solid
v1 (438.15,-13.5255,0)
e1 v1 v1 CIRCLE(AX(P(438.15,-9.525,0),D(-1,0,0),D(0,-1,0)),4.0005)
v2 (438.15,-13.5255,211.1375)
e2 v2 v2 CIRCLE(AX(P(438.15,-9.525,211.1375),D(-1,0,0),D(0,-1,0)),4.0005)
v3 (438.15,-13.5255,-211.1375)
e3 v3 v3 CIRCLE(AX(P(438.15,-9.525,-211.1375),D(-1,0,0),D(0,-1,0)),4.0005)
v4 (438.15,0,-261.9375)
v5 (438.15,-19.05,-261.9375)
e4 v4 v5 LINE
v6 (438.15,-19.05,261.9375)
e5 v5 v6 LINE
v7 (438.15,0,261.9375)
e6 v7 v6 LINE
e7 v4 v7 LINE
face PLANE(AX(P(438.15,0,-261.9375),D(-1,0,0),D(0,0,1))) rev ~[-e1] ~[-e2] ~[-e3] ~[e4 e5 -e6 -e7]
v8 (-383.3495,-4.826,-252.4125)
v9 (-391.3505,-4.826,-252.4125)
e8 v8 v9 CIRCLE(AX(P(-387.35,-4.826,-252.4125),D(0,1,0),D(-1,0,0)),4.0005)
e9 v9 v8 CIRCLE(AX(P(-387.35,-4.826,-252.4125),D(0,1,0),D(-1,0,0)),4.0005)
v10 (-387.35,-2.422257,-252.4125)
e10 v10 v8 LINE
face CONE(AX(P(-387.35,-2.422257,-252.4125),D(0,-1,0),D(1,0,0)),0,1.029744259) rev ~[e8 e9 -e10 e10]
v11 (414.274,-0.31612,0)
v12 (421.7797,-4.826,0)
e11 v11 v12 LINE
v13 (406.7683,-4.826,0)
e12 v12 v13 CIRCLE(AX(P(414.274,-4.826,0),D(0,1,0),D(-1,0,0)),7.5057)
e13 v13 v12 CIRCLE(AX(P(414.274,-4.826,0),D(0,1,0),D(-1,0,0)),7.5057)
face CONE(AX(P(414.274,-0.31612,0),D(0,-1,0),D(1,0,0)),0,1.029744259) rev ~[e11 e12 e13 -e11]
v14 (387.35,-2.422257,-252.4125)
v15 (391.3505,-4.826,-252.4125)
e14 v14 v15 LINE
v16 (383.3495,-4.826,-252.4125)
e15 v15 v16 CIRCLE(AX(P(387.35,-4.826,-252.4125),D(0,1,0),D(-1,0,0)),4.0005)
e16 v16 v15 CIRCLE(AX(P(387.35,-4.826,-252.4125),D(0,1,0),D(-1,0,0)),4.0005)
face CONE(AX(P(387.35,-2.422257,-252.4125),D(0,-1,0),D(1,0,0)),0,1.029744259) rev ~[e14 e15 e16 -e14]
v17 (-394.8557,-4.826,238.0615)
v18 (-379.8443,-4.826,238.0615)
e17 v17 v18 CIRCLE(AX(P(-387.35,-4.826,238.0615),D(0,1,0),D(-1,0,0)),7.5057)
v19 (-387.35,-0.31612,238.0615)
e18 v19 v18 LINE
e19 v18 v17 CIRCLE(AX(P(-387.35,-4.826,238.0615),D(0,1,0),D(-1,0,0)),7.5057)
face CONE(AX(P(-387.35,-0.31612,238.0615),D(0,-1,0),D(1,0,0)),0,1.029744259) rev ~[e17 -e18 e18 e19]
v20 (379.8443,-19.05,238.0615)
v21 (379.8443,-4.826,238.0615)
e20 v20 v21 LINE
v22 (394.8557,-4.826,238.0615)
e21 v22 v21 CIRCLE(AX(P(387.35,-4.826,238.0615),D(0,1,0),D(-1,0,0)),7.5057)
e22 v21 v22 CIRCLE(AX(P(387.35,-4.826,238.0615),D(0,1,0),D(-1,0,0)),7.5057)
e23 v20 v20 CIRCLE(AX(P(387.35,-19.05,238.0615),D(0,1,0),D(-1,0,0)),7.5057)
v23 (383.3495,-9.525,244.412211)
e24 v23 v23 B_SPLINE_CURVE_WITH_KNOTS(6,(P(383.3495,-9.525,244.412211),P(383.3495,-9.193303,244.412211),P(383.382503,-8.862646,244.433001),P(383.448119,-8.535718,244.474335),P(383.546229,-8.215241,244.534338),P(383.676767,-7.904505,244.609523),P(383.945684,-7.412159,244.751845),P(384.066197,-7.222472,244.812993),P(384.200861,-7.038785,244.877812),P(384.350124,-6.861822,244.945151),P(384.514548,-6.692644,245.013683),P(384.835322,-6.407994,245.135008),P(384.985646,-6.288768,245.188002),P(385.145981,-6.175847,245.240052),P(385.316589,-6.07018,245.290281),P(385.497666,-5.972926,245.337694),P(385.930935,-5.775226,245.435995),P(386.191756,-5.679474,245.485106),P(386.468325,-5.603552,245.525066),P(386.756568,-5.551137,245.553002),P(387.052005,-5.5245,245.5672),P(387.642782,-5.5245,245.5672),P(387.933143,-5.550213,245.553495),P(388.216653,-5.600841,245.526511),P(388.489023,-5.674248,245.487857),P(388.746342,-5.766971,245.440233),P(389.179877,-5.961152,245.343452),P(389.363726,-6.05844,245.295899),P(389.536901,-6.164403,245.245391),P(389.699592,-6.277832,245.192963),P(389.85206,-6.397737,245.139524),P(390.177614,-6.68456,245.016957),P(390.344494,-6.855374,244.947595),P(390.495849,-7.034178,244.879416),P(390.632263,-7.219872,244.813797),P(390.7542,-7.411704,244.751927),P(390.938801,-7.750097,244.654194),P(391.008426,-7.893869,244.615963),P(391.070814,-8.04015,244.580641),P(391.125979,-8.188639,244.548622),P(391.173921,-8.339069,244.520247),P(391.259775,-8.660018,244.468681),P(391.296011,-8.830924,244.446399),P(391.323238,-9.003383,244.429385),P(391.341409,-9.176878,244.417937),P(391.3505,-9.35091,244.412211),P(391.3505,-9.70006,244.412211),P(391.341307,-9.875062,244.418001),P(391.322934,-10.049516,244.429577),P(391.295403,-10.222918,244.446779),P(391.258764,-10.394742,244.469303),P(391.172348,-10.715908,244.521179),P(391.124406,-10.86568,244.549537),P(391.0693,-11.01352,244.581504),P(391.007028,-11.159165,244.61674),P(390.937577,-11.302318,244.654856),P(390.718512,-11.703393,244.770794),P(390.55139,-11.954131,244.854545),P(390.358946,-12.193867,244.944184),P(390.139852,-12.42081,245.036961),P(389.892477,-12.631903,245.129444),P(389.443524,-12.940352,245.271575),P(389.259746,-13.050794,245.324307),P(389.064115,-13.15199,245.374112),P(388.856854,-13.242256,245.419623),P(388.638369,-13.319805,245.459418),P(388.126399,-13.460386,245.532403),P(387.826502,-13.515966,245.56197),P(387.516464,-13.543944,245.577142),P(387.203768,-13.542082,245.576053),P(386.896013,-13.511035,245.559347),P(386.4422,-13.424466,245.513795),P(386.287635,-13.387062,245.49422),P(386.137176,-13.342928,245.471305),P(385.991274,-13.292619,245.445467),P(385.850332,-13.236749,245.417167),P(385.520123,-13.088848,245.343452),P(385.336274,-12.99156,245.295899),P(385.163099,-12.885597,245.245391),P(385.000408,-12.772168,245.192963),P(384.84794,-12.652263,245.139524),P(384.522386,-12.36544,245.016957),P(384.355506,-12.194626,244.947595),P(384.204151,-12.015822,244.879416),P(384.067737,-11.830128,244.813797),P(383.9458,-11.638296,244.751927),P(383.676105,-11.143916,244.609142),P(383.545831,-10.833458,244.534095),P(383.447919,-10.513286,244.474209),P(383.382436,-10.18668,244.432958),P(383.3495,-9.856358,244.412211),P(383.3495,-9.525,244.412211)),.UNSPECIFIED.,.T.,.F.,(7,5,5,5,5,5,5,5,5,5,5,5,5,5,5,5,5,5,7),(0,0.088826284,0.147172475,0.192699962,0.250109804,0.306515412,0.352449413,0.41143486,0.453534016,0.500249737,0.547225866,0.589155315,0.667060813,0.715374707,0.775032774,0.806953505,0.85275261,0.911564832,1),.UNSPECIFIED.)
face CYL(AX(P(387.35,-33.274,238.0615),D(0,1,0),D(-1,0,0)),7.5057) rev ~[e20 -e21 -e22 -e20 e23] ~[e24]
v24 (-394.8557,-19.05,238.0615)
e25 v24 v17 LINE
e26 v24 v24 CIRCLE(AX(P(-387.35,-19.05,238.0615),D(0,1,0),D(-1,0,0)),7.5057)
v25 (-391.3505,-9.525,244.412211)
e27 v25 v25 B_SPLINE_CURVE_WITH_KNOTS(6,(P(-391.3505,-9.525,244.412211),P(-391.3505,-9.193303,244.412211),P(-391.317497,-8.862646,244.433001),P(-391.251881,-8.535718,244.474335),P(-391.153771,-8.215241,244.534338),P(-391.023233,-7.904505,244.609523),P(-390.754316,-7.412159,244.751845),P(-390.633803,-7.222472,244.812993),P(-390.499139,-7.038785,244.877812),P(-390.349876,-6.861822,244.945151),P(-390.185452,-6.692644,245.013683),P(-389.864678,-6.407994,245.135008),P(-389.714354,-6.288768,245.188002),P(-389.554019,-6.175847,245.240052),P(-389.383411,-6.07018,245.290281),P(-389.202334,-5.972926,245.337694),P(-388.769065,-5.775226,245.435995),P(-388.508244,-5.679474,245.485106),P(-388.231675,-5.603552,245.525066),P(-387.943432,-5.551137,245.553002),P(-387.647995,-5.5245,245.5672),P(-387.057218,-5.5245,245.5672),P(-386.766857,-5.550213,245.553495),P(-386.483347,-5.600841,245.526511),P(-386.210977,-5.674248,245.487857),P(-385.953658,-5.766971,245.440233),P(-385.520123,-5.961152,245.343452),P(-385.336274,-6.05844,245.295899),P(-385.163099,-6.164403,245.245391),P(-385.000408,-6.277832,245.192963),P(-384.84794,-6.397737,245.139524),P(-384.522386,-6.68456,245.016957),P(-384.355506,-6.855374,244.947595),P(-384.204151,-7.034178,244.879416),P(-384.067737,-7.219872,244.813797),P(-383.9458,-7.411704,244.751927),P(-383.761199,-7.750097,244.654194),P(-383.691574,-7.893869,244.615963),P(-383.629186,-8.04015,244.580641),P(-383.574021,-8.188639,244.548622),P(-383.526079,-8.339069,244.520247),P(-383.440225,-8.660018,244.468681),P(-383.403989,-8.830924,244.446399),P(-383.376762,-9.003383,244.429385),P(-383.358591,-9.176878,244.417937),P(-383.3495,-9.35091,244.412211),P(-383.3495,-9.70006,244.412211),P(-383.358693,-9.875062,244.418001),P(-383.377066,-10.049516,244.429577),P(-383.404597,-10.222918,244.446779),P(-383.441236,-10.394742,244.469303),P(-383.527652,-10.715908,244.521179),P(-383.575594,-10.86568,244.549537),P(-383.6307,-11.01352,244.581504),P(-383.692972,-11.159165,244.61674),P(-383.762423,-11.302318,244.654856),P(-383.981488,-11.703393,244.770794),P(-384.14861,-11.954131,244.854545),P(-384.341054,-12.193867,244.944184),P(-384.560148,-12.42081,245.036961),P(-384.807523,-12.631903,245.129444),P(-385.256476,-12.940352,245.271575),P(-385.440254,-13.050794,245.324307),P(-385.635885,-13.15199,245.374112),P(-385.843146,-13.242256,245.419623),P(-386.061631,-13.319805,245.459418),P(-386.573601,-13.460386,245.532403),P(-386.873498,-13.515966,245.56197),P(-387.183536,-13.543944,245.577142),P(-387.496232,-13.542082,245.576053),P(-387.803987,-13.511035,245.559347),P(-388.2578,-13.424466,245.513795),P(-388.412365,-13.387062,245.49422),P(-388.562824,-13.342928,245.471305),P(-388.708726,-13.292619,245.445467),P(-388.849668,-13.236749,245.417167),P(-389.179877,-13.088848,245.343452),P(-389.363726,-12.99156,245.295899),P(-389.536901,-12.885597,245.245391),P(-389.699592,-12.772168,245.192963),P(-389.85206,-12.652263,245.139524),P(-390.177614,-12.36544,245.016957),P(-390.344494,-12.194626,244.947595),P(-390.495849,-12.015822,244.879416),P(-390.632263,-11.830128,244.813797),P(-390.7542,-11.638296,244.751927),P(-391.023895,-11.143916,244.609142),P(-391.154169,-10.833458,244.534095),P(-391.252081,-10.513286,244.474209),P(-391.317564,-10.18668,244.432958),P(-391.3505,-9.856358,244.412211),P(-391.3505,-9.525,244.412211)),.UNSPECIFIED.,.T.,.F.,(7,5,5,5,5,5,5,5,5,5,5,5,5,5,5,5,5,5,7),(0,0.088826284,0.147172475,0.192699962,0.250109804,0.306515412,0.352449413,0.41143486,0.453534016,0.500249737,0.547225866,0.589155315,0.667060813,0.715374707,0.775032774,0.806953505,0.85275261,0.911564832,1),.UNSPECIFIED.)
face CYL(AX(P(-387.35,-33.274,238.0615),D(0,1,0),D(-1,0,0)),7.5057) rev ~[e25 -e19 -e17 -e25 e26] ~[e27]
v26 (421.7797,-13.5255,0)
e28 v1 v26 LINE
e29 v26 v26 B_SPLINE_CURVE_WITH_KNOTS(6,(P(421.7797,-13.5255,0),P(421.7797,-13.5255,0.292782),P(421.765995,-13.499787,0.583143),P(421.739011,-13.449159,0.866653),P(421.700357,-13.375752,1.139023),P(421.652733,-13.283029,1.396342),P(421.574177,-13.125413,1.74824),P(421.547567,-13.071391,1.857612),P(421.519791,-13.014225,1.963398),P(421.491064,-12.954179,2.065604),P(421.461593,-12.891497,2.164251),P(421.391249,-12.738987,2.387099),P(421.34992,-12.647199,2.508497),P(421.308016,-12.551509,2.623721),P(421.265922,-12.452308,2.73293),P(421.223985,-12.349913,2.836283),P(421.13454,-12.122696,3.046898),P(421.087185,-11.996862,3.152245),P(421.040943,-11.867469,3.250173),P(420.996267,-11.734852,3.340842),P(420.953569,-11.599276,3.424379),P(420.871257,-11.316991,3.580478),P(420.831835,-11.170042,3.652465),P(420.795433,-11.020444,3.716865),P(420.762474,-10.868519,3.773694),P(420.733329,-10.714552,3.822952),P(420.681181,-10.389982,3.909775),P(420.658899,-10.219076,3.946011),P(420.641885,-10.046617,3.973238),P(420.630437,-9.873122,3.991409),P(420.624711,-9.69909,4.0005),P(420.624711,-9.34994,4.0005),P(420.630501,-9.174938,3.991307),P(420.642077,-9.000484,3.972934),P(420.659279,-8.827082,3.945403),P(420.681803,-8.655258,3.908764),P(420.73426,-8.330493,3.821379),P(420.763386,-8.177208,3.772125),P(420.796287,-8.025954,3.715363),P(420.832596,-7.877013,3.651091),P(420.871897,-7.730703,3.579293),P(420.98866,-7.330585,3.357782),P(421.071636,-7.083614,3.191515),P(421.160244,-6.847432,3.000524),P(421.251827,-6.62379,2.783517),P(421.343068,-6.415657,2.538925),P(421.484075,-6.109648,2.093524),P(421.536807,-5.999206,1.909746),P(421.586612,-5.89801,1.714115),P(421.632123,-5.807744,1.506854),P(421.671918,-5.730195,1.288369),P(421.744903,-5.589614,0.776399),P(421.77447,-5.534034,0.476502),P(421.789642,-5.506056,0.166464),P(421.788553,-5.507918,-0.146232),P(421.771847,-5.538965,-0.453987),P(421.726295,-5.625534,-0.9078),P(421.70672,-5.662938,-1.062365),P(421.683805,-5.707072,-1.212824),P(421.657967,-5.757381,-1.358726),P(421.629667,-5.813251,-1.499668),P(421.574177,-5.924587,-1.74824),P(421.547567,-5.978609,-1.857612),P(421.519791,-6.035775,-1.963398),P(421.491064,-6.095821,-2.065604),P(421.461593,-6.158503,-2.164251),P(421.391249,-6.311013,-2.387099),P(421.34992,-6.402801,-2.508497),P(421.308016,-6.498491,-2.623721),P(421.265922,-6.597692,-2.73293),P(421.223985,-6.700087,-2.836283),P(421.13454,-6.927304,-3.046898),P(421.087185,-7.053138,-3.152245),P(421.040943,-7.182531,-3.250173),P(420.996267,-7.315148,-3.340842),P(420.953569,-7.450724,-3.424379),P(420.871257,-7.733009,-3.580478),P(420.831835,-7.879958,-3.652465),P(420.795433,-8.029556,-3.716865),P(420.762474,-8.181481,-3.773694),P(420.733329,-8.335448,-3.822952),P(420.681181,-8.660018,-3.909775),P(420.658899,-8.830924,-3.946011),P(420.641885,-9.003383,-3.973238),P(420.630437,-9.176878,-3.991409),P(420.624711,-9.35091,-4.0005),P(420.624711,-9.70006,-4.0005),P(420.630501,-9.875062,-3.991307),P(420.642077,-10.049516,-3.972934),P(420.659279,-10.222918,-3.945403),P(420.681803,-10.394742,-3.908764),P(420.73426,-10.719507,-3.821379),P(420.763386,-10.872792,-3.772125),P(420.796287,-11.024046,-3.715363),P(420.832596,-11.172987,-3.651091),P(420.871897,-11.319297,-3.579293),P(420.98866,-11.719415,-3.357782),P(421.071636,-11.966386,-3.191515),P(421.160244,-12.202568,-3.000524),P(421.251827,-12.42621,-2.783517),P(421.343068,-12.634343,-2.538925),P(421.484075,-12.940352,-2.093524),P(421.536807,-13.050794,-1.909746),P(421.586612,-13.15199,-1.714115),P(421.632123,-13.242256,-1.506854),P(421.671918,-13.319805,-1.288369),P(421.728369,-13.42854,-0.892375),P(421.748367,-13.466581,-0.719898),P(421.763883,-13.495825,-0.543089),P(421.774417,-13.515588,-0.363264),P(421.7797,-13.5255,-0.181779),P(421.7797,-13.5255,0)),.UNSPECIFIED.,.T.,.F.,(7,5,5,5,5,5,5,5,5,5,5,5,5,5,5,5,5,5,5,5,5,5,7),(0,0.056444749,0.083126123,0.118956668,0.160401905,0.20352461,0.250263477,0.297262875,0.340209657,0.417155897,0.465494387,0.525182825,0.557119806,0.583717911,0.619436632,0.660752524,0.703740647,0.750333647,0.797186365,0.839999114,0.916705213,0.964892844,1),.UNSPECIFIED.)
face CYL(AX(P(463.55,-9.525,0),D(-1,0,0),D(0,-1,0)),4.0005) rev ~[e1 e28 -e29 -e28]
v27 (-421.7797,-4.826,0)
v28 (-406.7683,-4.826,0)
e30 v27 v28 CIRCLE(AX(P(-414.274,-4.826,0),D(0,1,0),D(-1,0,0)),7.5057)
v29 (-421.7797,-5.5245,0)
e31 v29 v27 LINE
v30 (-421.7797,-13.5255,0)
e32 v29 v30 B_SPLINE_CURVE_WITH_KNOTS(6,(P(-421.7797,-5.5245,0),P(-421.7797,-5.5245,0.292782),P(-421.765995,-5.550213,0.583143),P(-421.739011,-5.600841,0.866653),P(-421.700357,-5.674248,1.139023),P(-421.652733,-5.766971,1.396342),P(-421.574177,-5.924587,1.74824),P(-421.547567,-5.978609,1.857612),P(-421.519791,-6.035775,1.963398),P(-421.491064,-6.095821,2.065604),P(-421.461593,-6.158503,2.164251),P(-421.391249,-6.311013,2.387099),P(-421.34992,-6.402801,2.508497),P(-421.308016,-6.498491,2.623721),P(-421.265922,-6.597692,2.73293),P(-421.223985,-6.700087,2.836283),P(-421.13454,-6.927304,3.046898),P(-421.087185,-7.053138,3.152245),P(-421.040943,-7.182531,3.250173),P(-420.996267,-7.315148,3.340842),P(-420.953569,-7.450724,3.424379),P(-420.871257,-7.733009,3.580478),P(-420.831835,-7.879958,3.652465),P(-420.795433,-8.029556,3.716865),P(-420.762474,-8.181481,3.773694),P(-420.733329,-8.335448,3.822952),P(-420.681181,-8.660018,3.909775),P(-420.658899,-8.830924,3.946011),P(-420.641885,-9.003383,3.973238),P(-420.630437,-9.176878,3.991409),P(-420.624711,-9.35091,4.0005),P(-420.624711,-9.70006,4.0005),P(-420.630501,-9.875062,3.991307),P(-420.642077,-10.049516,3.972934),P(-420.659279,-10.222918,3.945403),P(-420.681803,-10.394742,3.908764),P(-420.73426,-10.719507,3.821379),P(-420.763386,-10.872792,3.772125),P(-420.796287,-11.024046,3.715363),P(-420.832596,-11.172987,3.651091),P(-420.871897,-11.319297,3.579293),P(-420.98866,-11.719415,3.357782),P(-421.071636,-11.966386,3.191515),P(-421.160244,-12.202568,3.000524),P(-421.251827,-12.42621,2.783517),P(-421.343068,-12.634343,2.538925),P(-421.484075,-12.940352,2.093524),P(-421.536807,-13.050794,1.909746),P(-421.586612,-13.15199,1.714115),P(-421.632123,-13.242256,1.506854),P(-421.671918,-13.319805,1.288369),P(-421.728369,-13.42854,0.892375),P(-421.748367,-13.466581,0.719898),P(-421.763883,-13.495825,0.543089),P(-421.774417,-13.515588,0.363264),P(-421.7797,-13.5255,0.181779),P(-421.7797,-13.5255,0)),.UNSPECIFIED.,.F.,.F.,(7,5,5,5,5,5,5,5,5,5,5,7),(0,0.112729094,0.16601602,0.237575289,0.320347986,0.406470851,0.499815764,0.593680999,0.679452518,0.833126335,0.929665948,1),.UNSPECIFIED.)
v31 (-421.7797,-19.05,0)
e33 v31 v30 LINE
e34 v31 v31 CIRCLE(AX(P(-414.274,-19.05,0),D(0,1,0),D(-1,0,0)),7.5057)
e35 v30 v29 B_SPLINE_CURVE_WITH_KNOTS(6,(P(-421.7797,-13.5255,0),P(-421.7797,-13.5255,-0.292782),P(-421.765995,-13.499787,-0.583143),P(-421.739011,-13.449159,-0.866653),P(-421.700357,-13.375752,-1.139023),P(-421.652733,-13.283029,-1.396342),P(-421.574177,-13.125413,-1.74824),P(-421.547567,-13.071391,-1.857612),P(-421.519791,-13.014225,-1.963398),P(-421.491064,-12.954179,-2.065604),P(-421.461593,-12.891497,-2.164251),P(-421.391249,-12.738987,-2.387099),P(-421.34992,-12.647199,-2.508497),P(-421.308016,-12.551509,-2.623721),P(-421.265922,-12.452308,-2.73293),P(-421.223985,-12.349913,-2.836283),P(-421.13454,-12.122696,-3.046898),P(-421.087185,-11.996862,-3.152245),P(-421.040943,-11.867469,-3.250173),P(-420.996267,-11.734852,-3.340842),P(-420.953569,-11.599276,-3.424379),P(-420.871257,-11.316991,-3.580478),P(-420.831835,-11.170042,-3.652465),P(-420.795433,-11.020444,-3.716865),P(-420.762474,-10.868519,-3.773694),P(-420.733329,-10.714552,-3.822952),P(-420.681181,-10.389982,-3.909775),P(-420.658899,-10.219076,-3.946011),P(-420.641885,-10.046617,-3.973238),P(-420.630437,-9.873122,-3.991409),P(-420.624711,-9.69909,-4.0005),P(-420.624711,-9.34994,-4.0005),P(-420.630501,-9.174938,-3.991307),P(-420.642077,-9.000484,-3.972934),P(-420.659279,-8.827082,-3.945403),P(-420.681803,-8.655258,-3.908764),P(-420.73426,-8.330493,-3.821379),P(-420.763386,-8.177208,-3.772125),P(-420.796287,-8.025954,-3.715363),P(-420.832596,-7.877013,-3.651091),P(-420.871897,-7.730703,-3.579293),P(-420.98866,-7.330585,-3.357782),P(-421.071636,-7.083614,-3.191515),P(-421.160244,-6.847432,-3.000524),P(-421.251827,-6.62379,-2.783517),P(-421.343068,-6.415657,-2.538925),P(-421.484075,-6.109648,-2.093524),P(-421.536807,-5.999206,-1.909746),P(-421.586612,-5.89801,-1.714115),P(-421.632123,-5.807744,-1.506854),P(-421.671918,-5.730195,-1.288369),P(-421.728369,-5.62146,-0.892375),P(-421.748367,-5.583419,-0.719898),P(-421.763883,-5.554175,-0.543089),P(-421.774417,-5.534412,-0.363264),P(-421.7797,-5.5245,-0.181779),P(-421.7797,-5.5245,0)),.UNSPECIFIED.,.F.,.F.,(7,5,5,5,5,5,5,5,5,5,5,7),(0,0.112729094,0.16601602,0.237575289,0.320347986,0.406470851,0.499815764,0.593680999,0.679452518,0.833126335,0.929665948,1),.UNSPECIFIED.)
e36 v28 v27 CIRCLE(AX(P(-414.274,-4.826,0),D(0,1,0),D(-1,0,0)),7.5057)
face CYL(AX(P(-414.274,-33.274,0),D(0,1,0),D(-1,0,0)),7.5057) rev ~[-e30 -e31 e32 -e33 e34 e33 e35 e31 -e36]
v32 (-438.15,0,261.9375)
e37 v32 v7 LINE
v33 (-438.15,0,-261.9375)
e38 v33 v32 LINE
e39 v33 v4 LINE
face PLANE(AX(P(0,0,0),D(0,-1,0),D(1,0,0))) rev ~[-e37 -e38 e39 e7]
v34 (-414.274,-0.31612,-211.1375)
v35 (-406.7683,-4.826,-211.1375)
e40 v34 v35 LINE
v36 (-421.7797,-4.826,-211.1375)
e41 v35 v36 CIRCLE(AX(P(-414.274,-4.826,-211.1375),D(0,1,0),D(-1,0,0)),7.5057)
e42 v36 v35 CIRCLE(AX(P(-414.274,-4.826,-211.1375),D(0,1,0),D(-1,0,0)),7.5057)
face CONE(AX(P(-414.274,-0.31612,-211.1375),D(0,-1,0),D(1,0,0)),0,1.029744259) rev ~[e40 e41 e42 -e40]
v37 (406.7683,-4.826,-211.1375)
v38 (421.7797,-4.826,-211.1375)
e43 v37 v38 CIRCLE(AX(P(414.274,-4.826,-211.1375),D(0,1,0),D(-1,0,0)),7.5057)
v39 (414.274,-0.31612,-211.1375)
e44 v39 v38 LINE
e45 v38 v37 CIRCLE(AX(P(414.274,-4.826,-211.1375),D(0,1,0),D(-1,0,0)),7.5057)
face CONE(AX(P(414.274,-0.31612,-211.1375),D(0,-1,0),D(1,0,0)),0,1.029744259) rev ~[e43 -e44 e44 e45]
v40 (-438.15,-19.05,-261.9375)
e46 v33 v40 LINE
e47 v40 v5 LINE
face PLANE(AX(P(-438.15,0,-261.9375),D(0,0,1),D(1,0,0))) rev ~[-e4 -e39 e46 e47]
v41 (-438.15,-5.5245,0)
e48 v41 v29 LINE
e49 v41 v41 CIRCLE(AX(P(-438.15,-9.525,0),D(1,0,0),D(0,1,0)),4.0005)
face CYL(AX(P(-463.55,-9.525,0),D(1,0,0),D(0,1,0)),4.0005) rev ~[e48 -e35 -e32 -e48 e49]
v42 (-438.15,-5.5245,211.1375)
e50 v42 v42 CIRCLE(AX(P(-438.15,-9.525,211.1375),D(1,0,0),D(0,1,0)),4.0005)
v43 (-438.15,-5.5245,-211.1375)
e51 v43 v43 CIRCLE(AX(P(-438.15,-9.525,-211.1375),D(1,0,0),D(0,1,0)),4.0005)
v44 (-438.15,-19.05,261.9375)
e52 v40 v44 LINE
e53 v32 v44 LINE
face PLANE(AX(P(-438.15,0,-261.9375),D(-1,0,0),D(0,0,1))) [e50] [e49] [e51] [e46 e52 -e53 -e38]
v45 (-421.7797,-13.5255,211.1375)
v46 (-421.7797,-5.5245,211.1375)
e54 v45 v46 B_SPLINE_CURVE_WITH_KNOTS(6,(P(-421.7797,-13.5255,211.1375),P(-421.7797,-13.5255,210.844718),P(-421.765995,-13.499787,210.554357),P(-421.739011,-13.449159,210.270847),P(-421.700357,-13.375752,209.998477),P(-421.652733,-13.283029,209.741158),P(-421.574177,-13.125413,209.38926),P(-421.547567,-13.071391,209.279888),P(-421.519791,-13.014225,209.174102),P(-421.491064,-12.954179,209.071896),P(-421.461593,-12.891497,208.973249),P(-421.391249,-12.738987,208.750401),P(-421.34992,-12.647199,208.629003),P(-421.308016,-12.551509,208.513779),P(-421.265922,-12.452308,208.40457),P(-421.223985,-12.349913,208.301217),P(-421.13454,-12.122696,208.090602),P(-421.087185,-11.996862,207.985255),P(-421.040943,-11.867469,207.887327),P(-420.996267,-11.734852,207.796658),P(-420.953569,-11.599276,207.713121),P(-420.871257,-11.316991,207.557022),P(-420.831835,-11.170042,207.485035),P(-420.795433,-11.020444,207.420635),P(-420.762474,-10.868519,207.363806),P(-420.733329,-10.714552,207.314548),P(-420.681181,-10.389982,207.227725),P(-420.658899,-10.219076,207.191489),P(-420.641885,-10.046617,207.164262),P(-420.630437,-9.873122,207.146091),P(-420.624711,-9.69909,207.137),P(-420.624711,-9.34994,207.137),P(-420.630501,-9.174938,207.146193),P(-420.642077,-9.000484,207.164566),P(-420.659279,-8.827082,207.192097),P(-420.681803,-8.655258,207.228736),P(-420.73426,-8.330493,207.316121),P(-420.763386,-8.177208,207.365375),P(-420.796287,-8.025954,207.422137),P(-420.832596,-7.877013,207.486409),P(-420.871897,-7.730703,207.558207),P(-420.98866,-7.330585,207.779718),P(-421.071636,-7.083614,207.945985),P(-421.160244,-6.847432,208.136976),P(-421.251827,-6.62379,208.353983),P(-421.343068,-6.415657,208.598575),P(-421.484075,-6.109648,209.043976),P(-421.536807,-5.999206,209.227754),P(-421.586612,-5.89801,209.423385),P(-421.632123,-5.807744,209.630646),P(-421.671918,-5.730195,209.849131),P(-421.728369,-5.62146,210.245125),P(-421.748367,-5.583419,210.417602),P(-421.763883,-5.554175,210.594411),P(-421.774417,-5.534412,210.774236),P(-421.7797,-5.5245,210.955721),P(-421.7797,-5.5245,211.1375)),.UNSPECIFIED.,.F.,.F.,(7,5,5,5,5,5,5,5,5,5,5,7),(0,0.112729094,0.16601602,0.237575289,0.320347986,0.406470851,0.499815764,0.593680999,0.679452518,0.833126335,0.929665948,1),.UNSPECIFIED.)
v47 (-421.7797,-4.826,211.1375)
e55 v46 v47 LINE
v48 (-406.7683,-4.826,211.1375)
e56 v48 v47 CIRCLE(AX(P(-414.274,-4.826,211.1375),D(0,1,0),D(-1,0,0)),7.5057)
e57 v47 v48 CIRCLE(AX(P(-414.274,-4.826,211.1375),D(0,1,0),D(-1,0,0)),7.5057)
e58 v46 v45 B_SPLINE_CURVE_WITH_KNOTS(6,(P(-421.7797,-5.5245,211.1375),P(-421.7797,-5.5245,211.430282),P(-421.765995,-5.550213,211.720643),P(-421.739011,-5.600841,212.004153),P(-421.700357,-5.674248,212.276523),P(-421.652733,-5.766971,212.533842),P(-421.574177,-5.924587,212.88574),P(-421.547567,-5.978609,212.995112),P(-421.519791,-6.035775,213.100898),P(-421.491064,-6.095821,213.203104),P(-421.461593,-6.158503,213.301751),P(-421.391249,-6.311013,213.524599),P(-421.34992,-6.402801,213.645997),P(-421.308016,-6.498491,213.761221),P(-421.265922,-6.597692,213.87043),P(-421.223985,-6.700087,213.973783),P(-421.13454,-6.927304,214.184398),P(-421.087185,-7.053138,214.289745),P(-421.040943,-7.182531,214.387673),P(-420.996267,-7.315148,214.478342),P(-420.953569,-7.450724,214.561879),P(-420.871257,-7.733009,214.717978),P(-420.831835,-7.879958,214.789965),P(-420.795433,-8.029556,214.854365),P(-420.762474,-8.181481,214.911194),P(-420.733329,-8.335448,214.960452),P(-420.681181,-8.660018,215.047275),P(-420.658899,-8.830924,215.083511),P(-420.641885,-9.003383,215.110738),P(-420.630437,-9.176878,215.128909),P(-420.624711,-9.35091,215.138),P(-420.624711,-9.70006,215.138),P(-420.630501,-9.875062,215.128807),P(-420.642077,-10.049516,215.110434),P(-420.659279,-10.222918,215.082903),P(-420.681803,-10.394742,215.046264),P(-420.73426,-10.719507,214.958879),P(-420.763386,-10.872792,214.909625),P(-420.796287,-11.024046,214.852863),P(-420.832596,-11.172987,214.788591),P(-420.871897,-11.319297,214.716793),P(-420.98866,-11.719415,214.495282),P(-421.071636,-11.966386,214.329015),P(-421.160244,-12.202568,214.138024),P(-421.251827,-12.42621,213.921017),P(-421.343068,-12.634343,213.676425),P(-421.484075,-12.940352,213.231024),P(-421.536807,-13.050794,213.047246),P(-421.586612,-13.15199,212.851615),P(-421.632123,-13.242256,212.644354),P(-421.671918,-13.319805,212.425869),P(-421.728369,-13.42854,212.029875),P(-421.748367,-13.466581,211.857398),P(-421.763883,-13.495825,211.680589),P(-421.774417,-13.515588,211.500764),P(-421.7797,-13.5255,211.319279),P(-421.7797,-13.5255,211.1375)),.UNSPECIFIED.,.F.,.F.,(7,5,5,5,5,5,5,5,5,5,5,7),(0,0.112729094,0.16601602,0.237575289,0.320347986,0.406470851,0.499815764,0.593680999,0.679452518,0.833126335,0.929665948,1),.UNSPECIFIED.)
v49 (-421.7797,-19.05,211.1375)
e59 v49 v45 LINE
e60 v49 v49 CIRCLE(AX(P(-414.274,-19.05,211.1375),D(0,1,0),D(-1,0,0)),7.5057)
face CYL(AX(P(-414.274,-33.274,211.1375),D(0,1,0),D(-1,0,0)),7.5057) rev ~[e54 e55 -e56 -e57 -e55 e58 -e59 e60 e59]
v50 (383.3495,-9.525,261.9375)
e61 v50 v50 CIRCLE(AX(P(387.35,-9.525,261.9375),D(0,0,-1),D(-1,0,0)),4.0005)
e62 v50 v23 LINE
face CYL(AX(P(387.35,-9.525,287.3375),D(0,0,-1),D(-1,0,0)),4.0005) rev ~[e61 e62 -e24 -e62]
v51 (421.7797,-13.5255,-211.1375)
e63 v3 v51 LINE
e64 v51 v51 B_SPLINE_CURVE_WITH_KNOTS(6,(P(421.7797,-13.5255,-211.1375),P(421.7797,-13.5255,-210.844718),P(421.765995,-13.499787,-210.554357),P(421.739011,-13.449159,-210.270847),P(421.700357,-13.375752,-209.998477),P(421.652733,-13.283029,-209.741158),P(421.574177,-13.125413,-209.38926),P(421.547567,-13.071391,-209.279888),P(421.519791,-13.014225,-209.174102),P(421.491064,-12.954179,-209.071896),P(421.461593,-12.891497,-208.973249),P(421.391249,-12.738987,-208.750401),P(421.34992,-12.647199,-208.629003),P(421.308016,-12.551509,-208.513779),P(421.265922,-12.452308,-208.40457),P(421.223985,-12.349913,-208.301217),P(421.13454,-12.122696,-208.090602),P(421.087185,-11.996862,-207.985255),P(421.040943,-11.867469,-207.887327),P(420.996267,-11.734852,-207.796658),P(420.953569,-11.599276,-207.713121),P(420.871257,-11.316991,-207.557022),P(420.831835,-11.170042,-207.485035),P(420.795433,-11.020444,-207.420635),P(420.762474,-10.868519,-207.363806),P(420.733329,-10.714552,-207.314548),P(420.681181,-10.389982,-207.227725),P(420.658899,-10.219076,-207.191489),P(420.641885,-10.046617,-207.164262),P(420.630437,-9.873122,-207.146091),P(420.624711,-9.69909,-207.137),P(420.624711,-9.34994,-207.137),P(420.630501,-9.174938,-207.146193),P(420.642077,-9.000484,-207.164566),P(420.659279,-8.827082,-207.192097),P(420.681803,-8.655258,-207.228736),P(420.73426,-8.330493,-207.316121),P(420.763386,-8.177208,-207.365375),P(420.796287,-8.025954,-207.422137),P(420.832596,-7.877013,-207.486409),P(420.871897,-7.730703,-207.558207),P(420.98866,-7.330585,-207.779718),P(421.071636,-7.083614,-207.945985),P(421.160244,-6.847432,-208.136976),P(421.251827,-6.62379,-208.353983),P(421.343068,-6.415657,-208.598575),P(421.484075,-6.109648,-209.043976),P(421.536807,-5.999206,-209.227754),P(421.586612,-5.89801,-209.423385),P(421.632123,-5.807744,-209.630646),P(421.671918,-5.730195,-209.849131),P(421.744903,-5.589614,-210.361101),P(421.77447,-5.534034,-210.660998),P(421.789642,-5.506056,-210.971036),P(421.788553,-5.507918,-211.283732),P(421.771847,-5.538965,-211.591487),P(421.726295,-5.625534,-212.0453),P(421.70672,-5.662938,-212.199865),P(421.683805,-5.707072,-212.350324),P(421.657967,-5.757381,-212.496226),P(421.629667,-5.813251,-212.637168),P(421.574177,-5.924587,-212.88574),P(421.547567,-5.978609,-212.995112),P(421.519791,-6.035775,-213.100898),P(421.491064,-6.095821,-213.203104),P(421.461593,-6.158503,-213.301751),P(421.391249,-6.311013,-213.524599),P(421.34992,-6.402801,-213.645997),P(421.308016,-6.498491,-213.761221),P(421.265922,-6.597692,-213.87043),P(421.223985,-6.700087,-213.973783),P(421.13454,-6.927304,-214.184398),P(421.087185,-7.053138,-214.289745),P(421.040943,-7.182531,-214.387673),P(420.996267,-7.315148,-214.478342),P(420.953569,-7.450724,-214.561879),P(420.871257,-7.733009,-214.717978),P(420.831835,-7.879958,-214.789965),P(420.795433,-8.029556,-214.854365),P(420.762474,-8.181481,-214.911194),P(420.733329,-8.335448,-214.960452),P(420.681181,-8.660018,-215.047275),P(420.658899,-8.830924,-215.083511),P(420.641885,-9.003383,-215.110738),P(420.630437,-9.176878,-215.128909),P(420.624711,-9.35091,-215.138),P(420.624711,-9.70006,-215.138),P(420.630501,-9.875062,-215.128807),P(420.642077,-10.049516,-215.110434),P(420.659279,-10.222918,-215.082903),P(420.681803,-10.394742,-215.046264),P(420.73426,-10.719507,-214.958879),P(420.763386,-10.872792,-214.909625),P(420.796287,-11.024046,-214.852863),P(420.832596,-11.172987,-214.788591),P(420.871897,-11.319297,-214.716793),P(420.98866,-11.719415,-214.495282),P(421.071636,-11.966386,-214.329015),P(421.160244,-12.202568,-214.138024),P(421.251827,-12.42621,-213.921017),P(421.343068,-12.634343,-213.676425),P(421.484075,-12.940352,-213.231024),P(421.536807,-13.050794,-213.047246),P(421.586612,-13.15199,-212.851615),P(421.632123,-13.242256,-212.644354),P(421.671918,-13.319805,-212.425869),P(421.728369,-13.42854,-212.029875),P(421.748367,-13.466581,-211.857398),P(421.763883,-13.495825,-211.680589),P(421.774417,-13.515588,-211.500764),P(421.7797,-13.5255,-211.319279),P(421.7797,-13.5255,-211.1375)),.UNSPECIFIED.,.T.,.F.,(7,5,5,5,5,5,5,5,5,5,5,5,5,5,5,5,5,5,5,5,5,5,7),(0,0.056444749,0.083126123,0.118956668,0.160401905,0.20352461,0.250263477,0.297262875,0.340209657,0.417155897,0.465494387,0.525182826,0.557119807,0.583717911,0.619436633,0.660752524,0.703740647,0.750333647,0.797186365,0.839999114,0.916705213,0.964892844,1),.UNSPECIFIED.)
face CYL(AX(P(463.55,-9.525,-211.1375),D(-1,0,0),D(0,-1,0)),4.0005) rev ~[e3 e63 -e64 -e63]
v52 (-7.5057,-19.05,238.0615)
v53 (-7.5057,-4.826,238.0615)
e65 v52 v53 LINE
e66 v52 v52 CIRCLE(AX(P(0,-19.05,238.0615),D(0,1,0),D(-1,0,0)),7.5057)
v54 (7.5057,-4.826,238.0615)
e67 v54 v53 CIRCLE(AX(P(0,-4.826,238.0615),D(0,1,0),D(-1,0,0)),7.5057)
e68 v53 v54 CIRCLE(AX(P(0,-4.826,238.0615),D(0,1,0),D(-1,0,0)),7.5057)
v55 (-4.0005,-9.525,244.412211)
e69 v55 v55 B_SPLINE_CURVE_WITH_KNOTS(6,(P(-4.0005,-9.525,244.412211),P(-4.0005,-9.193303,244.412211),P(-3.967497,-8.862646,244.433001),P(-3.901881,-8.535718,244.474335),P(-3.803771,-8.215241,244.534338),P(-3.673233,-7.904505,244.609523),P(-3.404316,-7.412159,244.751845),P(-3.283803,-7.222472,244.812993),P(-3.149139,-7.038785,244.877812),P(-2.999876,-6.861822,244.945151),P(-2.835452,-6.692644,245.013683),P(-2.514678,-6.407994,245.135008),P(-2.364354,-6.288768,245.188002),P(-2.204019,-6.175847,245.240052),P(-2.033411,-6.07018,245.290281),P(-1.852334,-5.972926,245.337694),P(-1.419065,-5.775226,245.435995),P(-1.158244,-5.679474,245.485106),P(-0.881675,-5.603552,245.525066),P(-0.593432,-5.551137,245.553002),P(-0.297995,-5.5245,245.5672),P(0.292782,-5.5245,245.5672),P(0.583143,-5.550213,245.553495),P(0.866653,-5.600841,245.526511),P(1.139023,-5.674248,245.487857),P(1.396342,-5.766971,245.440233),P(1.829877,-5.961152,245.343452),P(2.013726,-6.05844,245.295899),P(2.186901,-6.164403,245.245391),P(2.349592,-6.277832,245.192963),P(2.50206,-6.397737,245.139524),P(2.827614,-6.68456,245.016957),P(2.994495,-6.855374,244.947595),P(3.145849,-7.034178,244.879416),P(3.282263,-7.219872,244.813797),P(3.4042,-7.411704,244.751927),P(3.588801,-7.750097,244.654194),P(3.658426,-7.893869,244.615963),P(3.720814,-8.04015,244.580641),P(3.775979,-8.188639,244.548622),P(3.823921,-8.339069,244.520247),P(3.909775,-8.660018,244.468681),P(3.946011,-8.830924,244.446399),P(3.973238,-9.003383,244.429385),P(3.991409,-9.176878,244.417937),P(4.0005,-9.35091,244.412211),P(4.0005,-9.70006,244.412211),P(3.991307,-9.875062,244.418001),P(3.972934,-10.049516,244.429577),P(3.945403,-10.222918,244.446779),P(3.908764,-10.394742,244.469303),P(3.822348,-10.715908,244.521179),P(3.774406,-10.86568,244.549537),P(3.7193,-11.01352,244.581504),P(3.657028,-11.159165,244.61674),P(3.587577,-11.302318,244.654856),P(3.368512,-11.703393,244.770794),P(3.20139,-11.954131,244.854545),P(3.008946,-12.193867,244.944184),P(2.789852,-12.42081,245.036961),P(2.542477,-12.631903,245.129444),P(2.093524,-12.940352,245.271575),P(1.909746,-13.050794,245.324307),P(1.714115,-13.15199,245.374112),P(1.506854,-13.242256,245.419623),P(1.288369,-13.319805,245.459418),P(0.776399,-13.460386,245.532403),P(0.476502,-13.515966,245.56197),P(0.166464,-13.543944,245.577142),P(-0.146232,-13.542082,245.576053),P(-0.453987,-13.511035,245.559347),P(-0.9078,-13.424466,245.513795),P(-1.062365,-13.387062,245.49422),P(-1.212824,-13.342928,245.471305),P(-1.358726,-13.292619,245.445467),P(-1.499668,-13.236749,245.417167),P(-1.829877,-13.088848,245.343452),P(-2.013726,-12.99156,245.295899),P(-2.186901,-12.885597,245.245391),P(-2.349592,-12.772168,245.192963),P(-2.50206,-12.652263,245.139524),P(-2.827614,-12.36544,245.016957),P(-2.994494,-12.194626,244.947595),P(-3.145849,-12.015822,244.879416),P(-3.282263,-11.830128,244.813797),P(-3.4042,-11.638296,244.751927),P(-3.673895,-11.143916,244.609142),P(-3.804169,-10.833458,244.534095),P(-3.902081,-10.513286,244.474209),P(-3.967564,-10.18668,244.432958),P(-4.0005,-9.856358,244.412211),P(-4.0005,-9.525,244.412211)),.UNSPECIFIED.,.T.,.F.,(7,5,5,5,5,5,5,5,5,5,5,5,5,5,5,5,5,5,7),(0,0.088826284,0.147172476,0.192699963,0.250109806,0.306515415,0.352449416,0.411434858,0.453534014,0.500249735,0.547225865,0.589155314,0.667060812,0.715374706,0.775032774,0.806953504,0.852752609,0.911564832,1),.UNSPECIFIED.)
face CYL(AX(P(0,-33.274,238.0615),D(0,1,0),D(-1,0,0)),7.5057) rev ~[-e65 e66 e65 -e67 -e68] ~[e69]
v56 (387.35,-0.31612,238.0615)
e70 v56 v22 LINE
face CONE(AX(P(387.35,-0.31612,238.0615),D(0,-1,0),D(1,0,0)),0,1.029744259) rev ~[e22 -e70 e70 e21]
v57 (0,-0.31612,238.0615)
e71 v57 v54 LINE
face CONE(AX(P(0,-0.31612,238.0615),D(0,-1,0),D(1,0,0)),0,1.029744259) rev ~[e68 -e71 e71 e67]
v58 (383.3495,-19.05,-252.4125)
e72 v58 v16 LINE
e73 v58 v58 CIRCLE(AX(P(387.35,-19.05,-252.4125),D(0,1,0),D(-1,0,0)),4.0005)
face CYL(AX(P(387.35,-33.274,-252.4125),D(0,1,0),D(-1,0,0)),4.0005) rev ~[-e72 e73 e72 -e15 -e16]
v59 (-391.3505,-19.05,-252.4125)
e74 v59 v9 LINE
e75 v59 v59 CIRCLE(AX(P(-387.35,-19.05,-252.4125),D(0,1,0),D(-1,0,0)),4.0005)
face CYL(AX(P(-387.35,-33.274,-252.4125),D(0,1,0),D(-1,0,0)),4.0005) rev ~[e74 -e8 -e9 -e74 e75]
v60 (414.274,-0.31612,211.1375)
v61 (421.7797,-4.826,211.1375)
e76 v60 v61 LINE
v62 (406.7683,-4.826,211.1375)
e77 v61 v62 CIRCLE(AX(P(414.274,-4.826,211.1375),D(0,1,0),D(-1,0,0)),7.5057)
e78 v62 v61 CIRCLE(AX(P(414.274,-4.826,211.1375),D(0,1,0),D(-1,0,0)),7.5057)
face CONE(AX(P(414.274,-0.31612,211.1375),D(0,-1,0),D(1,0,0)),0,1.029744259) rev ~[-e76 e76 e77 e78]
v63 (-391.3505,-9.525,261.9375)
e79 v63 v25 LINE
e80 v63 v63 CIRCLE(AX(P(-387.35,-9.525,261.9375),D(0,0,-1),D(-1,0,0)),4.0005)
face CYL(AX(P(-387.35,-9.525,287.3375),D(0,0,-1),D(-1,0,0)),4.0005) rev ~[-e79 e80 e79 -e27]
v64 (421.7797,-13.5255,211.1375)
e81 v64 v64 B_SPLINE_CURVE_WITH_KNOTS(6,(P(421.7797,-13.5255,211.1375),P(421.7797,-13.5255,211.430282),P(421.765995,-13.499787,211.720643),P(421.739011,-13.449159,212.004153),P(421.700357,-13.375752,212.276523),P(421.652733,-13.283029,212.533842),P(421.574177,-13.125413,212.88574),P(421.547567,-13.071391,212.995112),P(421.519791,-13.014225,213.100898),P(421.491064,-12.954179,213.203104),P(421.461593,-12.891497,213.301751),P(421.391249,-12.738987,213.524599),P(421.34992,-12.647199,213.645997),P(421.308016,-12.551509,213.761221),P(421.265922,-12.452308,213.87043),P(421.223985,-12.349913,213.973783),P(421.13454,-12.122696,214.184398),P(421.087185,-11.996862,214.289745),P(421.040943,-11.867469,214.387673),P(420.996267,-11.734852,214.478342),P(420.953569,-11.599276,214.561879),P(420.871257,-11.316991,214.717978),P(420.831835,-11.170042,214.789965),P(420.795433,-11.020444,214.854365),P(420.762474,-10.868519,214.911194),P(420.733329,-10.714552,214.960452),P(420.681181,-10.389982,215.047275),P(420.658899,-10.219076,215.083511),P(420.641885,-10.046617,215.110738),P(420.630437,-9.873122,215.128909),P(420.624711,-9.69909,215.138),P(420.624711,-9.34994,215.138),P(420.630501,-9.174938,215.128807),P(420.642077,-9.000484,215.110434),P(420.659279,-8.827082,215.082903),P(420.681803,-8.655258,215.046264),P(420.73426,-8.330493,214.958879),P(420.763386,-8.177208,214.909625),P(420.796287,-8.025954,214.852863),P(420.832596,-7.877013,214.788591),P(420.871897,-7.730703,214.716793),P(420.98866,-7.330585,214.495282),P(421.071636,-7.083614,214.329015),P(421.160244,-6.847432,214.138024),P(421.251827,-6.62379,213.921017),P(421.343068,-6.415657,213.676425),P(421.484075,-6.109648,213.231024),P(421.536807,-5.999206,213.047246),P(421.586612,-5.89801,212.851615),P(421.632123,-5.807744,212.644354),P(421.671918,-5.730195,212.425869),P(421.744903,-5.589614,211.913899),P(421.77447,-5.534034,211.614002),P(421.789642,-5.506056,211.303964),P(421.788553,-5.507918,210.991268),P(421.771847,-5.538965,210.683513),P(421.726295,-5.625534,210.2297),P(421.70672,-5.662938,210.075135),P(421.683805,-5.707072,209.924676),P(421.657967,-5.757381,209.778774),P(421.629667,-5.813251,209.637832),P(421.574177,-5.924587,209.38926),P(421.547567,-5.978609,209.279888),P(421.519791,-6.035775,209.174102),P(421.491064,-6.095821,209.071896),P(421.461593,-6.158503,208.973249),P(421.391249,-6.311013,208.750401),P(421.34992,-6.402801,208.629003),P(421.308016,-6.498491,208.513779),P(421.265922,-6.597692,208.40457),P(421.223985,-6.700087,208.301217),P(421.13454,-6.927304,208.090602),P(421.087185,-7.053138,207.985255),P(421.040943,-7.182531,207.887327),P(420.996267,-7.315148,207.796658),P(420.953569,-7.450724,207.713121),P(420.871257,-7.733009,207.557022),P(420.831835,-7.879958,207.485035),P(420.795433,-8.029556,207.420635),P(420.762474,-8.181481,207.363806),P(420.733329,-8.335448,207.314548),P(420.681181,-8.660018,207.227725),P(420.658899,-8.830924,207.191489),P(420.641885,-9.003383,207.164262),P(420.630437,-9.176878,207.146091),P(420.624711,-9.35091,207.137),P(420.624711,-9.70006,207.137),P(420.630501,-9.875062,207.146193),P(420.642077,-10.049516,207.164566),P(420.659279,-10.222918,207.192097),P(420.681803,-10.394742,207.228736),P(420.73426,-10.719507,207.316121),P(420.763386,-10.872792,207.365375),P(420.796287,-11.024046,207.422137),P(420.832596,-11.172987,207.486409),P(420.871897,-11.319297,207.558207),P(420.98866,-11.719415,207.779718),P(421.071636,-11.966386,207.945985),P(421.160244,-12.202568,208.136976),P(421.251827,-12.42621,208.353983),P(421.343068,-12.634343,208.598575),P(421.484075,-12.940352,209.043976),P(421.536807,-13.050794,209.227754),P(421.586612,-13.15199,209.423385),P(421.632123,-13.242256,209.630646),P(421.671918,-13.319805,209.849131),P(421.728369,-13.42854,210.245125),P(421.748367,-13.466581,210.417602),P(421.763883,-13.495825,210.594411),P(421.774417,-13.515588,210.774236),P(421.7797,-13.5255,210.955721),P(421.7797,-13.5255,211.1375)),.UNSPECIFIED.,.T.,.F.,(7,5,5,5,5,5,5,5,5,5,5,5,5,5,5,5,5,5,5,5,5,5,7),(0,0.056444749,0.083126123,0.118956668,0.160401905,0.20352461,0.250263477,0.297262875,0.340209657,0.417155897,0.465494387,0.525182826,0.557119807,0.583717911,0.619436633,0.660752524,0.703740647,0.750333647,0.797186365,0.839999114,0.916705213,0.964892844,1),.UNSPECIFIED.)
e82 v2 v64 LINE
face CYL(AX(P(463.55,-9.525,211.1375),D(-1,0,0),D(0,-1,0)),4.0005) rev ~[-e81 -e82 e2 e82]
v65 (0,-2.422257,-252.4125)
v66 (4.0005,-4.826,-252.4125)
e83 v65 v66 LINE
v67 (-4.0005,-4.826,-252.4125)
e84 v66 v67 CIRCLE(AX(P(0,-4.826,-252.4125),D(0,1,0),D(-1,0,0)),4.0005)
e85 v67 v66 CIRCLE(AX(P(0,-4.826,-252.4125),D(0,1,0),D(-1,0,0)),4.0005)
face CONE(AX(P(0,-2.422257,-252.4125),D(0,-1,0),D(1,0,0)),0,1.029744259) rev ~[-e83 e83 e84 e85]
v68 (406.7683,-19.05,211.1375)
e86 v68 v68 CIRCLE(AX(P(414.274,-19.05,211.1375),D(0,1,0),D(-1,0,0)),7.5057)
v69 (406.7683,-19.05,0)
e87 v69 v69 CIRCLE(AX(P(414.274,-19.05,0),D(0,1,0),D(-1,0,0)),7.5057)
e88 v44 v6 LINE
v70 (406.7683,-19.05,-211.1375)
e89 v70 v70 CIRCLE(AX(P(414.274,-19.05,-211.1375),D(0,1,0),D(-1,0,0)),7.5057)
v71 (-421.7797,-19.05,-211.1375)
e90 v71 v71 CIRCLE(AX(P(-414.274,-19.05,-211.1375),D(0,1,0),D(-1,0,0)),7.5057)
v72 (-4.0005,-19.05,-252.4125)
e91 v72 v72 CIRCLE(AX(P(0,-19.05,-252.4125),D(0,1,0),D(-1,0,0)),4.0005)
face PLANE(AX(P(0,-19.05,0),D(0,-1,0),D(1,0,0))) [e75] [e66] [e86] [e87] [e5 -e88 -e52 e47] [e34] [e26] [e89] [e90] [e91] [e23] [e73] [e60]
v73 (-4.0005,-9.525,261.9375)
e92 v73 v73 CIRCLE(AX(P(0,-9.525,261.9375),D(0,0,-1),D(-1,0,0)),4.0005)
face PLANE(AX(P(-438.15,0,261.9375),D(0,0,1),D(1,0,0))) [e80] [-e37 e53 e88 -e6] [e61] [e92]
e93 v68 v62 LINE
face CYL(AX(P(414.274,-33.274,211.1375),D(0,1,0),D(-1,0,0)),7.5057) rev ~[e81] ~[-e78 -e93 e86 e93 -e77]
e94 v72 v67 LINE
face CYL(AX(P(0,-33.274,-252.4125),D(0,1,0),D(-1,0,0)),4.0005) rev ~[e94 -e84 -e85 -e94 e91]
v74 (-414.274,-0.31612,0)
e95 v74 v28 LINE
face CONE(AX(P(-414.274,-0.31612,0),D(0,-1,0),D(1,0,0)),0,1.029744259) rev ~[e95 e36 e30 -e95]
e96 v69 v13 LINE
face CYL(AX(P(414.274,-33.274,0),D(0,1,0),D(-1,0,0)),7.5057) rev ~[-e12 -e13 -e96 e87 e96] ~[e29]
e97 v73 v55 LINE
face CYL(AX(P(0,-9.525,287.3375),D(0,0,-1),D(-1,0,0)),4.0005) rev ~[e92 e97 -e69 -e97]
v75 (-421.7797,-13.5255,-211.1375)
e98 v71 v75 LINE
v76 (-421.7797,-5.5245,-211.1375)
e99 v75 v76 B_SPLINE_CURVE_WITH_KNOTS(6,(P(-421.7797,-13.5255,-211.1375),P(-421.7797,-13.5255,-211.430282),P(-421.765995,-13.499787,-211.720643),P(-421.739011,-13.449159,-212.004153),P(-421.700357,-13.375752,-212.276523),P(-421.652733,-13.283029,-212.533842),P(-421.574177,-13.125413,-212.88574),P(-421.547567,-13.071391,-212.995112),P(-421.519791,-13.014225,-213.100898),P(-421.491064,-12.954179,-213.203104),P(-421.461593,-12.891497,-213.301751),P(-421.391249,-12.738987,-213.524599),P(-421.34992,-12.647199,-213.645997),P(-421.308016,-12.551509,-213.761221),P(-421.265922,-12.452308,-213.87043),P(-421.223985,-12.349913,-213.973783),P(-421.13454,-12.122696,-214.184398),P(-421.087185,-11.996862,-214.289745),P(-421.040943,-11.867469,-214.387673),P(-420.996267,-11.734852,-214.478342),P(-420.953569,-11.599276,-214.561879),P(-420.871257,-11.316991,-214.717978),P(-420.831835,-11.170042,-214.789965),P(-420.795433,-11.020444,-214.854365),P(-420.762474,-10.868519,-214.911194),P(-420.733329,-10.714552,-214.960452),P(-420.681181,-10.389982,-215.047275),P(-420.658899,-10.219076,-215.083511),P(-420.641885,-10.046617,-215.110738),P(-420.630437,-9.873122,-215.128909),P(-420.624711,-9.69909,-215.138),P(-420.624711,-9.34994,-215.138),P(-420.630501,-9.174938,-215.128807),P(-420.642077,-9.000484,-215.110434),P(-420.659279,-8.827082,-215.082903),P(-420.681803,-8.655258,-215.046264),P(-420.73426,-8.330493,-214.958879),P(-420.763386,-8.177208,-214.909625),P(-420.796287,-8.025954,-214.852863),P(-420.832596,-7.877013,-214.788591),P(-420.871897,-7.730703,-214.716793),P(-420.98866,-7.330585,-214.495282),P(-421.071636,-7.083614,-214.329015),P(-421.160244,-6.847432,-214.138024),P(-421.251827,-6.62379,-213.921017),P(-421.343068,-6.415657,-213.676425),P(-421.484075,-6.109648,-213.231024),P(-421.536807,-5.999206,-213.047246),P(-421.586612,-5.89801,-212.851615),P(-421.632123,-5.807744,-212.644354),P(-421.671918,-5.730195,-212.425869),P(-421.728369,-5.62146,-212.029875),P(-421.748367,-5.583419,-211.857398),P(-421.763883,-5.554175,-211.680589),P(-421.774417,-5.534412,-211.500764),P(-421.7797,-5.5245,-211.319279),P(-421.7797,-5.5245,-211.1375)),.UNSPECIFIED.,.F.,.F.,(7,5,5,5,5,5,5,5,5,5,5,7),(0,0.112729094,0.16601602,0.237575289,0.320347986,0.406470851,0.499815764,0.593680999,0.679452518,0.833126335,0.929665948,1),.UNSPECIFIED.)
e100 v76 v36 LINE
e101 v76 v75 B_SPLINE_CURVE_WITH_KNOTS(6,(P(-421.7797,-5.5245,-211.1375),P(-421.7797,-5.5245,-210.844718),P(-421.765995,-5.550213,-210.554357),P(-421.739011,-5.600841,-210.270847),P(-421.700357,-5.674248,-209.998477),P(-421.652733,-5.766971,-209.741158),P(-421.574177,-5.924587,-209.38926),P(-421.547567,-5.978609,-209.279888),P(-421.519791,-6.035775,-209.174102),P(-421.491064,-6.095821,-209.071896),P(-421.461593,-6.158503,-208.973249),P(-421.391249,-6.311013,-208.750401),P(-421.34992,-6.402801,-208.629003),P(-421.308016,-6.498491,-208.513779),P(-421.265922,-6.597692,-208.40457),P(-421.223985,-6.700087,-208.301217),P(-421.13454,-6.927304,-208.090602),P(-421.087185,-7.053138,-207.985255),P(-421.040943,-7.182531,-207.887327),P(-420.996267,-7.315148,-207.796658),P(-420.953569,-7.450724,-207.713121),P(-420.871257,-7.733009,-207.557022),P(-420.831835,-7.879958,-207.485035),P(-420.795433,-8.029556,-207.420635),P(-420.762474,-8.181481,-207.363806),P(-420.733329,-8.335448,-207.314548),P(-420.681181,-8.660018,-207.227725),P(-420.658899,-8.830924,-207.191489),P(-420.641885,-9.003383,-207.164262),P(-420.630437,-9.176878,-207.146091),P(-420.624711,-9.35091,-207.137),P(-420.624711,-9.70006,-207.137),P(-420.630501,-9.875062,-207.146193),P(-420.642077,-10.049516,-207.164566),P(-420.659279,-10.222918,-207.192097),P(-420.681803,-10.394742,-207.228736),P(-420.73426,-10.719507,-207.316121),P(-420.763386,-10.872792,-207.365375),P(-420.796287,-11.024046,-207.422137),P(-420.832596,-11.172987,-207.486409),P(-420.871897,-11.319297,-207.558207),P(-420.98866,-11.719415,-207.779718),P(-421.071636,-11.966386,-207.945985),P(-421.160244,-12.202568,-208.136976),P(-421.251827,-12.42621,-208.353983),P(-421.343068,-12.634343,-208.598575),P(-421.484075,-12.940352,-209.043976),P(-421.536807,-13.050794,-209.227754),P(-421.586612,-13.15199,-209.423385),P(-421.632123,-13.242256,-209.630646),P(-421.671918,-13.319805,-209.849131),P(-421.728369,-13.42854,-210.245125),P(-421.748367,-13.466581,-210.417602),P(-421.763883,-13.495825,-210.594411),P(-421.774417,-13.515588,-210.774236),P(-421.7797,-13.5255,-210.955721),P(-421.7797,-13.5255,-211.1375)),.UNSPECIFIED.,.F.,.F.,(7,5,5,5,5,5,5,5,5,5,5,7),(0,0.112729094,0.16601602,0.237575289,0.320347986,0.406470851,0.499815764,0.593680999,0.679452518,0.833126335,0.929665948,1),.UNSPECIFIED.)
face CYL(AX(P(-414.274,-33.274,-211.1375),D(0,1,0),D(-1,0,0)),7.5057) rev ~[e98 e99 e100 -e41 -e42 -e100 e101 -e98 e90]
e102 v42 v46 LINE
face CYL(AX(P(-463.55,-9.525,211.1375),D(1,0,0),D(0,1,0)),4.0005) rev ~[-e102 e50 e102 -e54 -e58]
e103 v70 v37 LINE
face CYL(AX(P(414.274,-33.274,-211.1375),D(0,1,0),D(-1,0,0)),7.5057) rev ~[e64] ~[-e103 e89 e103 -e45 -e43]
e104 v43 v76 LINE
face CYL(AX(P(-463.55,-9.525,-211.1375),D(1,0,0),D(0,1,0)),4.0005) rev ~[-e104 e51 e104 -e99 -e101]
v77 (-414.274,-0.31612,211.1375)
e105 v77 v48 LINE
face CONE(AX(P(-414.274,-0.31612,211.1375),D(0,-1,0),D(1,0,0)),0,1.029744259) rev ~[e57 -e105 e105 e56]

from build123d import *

# Parameters (mm, degrees)
F0_W      = 876.3
F0_H      = 523.875
F1_DEPTH  = 19.05
F3_D      = 15.0114
F3_DEPTH  = 14.224
F3_TIP    = 4.5098795482
F4_D      = 8.001
F4_DEPTH  = 14.224
F4_TIP    = 2.4037429064
F6_D      = 8.001
F6_DEPTH  = 25.4
F6_TIP    = 2.4037429064
F8_D      = 8.001
F8_DEPTH  = 25.4
F8_TIP    = 2.4037429064
F10_D     = 8.001
F10_DEPTH = 25.4
F10_TIP   = 2.4037429064


with BuildPart() as f1:
    # F0 (on Front) → F1 (new body)
    with BuildSketch(Plane.XZ):
        Rectangle(F0_W, F0_H)
    extrude(amount=F1_DEPTH)

    # F3
    with Locations(Plane.XZ.offset(19.05)):
        with Locations((-387.35, 238.0615), (-414.274, 211.1375), (-414.274, 0), (-414.274, -211.1375), (0, 238.0615), (387.35, 238.0615), (414.274, 211.1375), (414.274, 0), (414.274, -211.1375)):
            Hole(F3_D / 2, depth=F3_DEPTH)
            with Locations((0, 0, -(F3_DEPTH + F3_TIP / 2))):  # 118° drill point
                Cone(0, F3_D / 2, F3_TIP, mode=Mode.SUBTRACT)

    # F4
    with Locations(Plane.XZ.offset(19.05)):
        with Locations((-387.35, -252.4125), (0, -252.4125), (387.35, -252.4125)):
            Hole(F4_D / 2, depth=F4_DEPTH)
            with Locations((0, 0, -(F4_DEPTH + F4_TIP / 2))):  # 118° drill point
                Cone(0, F4_D / 2, F4_TIP, mode=Mode.SUBTRACT)

    # F6
    with Locations(Plane.YZ.offset(438.15)):
        with Locations((-9.525, 211.1375), (-9.525, 0), (-9.525, -211.1375)):
            Hole(F6_D / 2, depth=F6_DEPTH)
            with Locations((0, 0, -(F6_DEPTH + F6_TIP / 2))):  # 118° drill point
                Cone(0, F6_D / 2, F6_TIP, mode=Mode.SUBTRACT)

    # F8
    with Locations(Plane(origin=(-438.15, 0, 0), x_dir=(0, -1, 0), z_dir=(-1, 0, 0))):
        with Locations((9.525, 211.1375), (9.525, 0), (9.525, -211.1375)):
            Hole(F8_D / 2, depth=F8_DEPTH)
            with Locations((0, 0, -(F8_DEPTH + F8_TIP / 2))):  # 118° drill point
                Cone(0, F8_D / 2, F8_TIP, mode=Mode.SUBTRACT)

    # F10
    with Locations(Plane.XY.offset(261.9375)):
        with Locations((-387.35, -9.525), (0, -9.525), (387.35, -9.525)):
            Hole(F10_D / 2, depth=F10_DEPTH)
            with Locations((0, 0, -(F10_DEPTH + F10_TIP / 2))):  # 118° drill point
                Cone(0, F10_D / 2, F10_TIP, mode=Mode.SUBTRACT)


solid = f1.part
